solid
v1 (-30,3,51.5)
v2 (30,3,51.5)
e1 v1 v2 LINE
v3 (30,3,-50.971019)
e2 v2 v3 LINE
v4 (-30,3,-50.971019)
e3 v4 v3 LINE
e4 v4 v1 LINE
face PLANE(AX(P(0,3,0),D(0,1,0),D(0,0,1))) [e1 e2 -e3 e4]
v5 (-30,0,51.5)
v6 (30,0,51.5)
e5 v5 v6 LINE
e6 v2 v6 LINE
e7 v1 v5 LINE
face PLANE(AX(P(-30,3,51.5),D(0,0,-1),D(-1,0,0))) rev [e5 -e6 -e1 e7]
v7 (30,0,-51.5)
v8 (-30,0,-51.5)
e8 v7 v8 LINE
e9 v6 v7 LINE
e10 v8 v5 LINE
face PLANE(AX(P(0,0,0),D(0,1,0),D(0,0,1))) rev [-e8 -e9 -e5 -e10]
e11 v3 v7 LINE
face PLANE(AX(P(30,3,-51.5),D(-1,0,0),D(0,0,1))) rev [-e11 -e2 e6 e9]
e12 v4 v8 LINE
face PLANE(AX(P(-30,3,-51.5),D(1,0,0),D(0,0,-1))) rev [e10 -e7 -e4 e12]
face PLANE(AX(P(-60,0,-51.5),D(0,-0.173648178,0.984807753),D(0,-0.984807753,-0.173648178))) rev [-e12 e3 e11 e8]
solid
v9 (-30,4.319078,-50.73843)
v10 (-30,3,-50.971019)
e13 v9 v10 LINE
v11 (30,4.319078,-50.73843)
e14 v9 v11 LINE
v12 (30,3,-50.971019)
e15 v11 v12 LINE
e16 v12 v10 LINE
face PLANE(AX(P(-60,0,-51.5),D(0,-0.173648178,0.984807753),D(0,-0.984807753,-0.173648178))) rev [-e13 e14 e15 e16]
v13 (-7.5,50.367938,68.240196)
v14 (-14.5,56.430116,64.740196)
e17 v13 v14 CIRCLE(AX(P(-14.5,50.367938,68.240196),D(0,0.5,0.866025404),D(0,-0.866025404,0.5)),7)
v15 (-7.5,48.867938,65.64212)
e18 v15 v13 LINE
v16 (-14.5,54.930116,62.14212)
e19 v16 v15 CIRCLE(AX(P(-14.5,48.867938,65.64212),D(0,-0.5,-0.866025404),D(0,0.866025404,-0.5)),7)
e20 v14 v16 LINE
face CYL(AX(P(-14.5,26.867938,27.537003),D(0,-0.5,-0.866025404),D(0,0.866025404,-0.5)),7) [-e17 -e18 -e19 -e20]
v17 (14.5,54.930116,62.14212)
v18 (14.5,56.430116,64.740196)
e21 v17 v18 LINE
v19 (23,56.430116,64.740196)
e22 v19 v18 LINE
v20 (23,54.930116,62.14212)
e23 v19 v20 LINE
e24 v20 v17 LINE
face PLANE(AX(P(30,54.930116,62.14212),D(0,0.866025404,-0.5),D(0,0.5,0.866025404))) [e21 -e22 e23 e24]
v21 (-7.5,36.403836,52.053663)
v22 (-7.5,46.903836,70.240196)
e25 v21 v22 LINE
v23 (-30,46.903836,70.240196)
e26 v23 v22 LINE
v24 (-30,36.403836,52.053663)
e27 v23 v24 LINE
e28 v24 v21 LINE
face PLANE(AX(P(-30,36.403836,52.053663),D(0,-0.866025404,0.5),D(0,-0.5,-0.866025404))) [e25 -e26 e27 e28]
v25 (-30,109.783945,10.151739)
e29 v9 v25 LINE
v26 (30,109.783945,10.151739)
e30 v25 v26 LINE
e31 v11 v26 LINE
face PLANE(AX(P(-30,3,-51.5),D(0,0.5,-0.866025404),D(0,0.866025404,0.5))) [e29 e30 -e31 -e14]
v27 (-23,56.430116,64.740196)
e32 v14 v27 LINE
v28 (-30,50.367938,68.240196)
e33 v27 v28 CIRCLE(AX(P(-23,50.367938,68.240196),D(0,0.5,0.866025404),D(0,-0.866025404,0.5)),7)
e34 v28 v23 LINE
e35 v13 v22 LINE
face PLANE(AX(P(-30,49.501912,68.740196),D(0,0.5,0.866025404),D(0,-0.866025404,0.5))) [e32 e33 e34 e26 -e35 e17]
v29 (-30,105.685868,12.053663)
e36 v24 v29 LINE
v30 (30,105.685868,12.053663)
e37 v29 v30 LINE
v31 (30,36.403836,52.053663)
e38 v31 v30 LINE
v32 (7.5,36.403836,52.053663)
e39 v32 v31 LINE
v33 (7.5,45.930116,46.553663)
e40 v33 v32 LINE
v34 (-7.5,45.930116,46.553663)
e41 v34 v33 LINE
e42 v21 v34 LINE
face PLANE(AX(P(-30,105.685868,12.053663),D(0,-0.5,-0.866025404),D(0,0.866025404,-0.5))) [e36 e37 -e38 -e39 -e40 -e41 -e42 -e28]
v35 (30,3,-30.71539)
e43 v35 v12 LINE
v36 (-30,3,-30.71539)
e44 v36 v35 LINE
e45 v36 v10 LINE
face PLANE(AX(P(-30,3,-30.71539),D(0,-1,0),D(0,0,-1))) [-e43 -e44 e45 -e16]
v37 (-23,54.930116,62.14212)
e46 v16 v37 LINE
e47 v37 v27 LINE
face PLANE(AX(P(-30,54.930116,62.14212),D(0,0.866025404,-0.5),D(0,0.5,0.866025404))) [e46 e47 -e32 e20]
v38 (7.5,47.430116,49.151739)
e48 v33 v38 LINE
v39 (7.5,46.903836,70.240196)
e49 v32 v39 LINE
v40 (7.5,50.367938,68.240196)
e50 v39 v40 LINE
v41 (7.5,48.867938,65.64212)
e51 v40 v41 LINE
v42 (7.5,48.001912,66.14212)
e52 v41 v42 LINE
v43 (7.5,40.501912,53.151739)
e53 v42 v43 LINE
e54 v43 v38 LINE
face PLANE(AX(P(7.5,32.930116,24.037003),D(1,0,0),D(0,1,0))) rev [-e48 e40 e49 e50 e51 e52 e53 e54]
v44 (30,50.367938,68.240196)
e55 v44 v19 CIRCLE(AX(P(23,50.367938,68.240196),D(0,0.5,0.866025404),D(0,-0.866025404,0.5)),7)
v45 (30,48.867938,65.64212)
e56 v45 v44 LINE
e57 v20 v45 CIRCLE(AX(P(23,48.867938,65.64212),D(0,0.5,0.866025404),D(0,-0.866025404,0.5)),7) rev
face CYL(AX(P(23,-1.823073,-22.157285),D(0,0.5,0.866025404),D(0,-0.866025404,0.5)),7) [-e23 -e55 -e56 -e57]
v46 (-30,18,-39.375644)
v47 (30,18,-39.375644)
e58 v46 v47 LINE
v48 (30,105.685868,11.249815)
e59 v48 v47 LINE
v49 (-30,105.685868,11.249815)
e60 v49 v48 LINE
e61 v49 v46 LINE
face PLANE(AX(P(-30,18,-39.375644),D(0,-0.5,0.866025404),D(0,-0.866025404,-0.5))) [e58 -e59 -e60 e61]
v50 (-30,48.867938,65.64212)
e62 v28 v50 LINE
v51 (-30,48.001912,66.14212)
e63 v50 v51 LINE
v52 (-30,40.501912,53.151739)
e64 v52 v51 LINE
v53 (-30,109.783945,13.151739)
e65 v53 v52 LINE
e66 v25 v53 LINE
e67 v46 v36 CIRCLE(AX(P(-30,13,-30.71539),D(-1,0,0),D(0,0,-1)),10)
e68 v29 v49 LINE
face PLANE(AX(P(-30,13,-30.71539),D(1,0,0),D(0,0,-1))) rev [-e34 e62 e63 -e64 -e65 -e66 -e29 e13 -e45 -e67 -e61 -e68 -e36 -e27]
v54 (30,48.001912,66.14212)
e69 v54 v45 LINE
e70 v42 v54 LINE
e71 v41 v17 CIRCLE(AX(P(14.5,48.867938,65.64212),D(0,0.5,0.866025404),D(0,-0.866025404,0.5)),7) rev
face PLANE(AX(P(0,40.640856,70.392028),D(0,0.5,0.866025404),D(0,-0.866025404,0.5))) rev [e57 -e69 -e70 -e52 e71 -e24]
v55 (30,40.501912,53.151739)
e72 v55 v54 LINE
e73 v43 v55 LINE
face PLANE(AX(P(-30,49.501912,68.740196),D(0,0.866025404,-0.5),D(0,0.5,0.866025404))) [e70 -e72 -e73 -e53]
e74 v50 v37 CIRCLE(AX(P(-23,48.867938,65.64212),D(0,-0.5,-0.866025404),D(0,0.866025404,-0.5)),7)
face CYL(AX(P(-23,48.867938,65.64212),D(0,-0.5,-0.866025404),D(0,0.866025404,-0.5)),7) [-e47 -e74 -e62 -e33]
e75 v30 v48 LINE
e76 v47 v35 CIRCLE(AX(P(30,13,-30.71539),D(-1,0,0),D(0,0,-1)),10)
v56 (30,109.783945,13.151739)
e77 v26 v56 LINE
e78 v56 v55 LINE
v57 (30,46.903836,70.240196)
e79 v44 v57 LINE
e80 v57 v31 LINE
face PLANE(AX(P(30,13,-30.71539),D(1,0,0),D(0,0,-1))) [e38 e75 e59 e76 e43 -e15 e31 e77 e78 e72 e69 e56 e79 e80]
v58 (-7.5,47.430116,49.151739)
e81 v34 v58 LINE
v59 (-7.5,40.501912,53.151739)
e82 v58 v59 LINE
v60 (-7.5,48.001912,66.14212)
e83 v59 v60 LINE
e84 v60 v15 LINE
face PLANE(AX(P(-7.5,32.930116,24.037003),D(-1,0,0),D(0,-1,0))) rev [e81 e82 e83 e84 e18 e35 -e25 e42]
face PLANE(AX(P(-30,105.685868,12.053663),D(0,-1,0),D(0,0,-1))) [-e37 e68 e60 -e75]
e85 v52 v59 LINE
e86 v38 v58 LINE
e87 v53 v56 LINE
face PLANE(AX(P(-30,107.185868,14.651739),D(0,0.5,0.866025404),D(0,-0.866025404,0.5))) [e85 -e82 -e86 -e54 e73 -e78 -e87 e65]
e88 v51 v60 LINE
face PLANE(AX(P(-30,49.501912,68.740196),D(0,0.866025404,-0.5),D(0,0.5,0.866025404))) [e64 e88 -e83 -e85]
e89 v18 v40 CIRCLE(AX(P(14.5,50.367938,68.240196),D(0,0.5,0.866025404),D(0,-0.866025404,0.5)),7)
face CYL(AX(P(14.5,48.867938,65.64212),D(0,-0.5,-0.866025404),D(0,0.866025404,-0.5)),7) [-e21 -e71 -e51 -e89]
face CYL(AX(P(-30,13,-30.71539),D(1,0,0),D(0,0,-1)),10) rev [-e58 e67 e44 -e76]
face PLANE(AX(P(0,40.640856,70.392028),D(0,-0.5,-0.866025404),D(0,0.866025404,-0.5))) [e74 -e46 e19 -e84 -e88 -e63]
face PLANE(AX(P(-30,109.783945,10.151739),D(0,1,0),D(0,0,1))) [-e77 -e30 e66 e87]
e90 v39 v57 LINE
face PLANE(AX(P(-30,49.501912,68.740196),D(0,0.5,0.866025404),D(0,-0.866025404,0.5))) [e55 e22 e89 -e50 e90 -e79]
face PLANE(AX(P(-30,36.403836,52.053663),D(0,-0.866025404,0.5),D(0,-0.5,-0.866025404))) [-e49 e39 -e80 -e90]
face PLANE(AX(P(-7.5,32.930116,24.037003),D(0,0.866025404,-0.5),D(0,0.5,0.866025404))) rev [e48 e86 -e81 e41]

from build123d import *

# Parameters (mm, degrees)
SKETCH1_W           = 60
SKETCH1_H           = 103
BOSS_EXTRUDE1_DEPTH = 3
BASE_FLANGE1_DEPTH  = 60
TAB2_DEPTH          = 60
SKETCH15_W          = 15
SKETCH15_H          = 11
CUT_EXTRUDE2_DEPTH  = 29
SKETCH16_W          = 22.5
SKETCH16_H          = 8
BOSS_EXTRUDE2_DEPTH = 3
FILLET1_R           = 7
CUT_EXTRUDE3_DEPTH  = 90


# Sheet-metal steps are written as plain solids
with BuildPart() as part:
    # Sketch1 → Boss-Extrude1 (new body)
    with BuildSketch(Plane(origin=(0, 0, 0), x_dir=(1, 0, 0), z_dir=(0, 1, 0))):
        Rectangle(SKETCH1_W, SKETCH1_H)
    extrude(amount=BOSS_EXTRUDE1_DEPTH)


with BuildPart() as body_2:
    # Sketch3 → Base-Flange1 (new body)
    with BuildSketch(Plane(origin=(30, 0, 0), x_dir=(0, 0, -1), z_dir=(1, 0, 0))):
        with BuildLine():
            Line((51.5, 3), (-8.651739219, 107.185868491))
            Line((-8.651739219, 107.185868491), (-11.249815431, 105.685868491))
            Line((-11.249815431, 105.685868491), (39.375644347, 18))
            ThreePointArc((39.375644347, 18), (39.375644347, 8), (30.715390309, 3))
            Line((30.715390309, 3), (48.035898385, 3))
            Line((48.035898385, 3), (51.5, 3))
        make_face()
    extrude(amount=-BASE_FLANGE1_DEPTH)

    # Sketch8 → Tab2 (add)
    with BuildSketch(Plane(origin=(30, 0, 0), x_dir=(0, 0, -1), z_dir=(1, 0, 0))):
        Polygon((-14.651739219, 107.185868491), (-13.151739219, 109.783944703), (-10.151739219, 109.783944703), (-8.651739219, 107.185868491), (-11.249815431, 105.685868491), (-12.053663008, 105.685868491), (-52.053663008, 36.403836188), (-54.651739219, 37.903836188), (-67.642120276, 45.403836188), (-70.240196487, 46.903836188), (-68.740196487, 49.5019124), (-66.142120276, 48.0019124), (-53.151739219, 40.5019124), align=None)
    extrude(amount=-TAB2_DEPTH)

    # Sketch15 → Cut-Extrude2 (cut, symmetric)
    with BuildSketch(Plane(origin=(0, 33.14085631, 57.401646934), x_dir=(1, 0, 0), z_dir=(0, 0.5000000000000021, 0.8660254037844374))):
        with Locations((0, 10.999815431)):
            Rectangle(SKETCH15_W, SKETCH15_H)
    extrude(amount=CUT_EXTRUDE2_DEPTH, both=True, mode=Mode.SUBTRACT)

    # Sketch16 → Boss-Extrude2 (add)
    with BuildSketch(Plane(origin=(0, 42.14085631, 72.990104203), x_dir=(1, 0, 0), z_dir=(0, 0.4999999999999961, 0.866025403784441))):
        with Locations((-18.75, 12.499815431)):
            Rectangle(SKETCH16_W, SKETCH16_H)
        with Locations((18.75, 12.499815431)):
            Rectangle(SKETCH16_W, SKETCH16_H)
    extrude(amount=-BOSS_EXTRUDE2_DEPTH)

    # Fillet1
    fillet1_edges = [body_2.edges().sort_by_distance(p)[0] for p in [
        (-30, 55.68011563, 63.441158382),
        (-7.5, 55.68011563, 63.441158382),
        (7.5, 55.68011563, 63.441158382),
        (30, 55.68011563, 63.441158382),
    ]]
    fillet(fillet1_edges, radius=FILLET1_R)


with BuildPart() as cut_extrude3_tool:
    # Sketch17 → Cut-Extrude3 (new body)
    with BuildSketch(Plane(origin=(30, 0, 0), x_dir=(0, 0, -1), z_dir=(1, 0, 0))):
        Polygon((51.5, 0), (50.738430041, 4.319077862), (51.5, 3), align=None)
    extrude(amount=-CUT_EXTRUDE3_DEPTH)


with BuildPart() as part_1:
    add(part.part)

    # Cut-Extrude3: cut by cut_extrude3_tool
    add(cut_extrude3_tool.part, mode=Mode.SUBTRACT)


with BuildPart() as body_2_1:
    add(body_2.part)

    # Cut-Extrude3: cut by cut_extrude3_tool
    add(cut_extrude3_tool.part, mode=Mode.SUBTRACT)


solid = Compound([part_1.part, body_2_1.part])
